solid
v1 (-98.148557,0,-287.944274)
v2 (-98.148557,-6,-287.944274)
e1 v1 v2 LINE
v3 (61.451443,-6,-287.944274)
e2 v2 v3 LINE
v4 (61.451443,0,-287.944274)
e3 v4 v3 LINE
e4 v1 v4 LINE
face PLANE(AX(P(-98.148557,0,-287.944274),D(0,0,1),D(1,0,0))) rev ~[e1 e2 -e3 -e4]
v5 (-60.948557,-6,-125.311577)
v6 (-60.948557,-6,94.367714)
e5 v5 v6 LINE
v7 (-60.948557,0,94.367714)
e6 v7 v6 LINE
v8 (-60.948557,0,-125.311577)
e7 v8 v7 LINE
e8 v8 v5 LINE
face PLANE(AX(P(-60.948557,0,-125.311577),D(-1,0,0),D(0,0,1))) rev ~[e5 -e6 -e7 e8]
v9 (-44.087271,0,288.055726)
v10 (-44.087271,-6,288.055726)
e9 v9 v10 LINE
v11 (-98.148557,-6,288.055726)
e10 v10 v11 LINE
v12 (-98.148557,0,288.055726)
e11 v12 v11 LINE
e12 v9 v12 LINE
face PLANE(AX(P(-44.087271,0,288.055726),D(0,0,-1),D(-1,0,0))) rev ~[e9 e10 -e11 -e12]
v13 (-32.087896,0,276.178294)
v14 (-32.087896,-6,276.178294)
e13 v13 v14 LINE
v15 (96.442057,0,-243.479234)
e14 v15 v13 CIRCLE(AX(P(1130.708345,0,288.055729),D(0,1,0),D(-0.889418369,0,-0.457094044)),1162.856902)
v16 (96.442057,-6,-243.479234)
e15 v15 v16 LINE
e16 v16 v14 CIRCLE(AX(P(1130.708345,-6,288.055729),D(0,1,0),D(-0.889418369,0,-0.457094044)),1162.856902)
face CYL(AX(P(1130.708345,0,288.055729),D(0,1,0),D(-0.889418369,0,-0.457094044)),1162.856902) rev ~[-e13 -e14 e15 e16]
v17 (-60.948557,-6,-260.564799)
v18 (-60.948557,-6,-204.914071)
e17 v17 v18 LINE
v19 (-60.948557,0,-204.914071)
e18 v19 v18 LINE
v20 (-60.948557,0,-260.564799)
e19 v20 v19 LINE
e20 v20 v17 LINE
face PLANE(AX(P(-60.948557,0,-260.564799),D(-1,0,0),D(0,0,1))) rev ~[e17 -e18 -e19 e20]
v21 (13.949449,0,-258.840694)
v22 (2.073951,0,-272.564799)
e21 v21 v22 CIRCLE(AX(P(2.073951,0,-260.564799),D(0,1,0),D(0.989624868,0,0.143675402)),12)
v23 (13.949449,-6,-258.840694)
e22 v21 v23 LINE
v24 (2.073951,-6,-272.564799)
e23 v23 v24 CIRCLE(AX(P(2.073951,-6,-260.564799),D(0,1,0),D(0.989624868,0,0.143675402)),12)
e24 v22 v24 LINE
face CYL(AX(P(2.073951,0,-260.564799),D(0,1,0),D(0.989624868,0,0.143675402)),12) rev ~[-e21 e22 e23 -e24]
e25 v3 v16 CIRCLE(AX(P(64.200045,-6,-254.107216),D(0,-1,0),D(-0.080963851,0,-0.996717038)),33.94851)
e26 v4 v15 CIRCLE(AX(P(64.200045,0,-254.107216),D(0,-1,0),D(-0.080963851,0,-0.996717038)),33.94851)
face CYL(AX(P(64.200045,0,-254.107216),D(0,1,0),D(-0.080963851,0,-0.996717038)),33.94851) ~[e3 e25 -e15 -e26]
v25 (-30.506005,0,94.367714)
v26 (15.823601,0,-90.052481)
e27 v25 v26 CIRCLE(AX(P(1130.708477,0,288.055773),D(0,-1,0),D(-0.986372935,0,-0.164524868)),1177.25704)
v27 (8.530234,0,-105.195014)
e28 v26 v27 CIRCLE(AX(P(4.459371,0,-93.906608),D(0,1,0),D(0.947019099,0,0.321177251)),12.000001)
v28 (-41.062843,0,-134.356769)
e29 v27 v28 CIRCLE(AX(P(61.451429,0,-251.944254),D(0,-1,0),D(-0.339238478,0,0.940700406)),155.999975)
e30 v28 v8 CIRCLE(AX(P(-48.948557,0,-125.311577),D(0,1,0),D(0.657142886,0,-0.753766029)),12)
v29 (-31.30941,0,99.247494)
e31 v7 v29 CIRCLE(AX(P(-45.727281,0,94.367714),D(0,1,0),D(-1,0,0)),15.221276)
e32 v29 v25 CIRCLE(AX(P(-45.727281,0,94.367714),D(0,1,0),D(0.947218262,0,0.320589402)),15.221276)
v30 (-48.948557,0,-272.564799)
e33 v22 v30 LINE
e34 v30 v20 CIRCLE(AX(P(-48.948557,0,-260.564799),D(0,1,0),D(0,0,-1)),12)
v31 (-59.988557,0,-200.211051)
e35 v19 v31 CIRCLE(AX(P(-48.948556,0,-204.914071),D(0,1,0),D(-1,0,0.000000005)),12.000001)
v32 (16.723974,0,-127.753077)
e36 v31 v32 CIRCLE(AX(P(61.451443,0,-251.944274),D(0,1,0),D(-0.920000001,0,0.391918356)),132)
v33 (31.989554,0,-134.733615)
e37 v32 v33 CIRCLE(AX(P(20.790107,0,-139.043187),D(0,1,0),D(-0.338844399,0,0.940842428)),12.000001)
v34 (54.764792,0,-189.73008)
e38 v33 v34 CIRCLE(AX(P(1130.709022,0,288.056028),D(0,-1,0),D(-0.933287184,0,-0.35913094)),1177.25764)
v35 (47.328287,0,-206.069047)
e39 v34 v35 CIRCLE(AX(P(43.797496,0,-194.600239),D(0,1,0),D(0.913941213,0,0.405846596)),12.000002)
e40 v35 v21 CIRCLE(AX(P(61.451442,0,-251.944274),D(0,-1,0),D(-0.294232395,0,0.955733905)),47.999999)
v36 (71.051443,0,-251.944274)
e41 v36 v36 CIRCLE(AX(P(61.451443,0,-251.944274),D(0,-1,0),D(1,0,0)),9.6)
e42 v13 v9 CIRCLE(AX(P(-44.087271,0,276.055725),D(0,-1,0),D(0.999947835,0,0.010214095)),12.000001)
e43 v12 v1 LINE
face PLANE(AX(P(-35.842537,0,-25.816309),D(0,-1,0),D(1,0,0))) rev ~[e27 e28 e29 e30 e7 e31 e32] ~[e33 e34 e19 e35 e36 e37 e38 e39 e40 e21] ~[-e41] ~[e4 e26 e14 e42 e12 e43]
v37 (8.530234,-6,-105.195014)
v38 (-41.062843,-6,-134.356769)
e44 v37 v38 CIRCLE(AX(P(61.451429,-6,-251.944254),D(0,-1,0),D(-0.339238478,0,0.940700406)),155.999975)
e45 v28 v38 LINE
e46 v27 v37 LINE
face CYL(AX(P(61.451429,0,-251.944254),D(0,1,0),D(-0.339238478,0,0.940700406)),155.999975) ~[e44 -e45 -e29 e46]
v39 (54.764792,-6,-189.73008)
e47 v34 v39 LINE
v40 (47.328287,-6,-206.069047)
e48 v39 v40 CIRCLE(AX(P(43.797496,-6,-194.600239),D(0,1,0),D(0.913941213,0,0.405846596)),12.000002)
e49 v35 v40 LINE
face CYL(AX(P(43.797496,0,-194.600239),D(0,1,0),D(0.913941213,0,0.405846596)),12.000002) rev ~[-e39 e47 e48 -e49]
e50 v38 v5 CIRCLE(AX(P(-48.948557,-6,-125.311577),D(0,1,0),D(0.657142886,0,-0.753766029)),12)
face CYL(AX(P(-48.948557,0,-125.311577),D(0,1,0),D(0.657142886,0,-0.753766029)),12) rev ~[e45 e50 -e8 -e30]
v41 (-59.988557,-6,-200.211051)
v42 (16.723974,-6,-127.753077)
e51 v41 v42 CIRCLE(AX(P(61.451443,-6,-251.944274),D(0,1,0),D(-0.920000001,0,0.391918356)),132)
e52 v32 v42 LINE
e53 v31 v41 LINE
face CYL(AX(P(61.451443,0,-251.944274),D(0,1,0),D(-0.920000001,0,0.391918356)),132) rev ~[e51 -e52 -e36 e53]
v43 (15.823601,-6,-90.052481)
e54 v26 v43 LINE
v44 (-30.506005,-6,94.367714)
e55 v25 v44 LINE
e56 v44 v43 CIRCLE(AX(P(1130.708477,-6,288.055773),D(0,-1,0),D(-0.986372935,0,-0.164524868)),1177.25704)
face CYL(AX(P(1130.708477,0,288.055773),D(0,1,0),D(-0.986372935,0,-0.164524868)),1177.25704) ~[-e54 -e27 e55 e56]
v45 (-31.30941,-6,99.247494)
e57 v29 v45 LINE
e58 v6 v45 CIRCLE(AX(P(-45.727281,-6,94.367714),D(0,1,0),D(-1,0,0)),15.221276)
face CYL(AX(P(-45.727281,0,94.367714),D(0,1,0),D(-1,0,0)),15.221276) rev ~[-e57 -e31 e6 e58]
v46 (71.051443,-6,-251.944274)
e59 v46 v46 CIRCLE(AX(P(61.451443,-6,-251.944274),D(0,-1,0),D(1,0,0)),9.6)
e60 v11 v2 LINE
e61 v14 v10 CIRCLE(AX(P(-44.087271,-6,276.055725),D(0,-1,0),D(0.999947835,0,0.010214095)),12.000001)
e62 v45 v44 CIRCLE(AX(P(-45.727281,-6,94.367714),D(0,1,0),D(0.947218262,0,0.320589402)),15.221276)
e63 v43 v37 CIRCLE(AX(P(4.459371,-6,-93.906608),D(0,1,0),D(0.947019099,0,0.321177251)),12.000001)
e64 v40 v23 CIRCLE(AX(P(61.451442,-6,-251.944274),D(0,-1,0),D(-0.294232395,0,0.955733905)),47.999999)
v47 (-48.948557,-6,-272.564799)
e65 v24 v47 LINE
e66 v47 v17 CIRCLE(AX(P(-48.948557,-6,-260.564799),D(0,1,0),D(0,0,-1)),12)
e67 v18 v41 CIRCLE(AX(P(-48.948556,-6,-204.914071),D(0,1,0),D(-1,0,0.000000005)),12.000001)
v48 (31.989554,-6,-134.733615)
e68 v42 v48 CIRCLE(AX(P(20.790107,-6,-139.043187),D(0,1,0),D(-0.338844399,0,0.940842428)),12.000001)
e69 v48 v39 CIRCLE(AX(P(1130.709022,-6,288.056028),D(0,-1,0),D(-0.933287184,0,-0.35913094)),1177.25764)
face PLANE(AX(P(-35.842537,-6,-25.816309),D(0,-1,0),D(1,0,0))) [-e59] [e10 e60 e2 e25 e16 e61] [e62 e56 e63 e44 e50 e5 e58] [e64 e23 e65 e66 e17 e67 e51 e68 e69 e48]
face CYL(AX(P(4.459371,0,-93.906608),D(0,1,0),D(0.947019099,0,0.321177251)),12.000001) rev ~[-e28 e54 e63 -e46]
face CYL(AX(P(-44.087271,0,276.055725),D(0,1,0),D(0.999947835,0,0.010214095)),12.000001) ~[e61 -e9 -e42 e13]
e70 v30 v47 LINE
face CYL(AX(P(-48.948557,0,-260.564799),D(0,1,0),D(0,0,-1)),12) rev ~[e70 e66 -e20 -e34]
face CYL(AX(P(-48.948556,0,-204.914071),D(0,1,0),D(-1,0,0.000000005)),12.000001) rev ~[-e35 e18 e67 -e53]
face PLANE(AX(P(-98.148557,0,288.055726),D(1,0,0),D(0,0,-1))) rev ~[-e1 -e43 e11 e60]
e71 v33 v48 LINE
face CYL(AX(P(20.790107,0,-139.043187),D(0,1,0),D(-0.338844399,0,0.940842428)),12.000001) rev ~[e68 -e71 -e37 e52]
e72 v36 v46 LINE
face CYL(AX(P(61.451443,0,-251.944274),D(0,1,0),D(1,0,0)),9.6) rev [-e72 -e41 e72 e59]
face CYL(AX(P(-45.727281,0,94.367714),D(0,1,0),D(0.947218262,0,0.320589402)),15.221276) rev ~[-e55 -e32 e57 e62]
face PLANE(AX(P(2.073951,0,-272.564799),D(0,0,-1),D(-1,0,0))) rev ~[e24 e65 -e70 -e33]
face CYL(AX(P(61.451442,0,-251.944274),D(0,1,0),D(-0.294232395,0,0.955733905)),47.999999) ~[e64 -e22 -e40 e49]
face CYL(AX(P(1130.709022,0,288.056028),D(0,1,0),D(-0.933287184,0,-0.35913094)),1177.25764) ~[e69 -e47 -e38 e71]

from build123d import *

# Parameters (mm, degrees)
F0_R     = 9.6
F1_DEPTH = 6


# Not quite as in the source:
# - ends of sketch curves that miss each other by under 0.0002 mm in the source are joined


with BuildPart() as f1:
    # F0 (on Front) → F1 (new body)
    with BuildSketch(Plane.XZ):
        with BuildLine():
            Line((-98.148557, 288.055726), (-98.148557, -287.944274))
            Line((-98.148557, -287.944274), (61.451443, -287.944274))
            ThreePointArc((61.451443, -287.944274), (90.8786929022, -275.1012880869), (96.4420569386, -243.4792343499))
            ThreePointArc((96.4420569386, -243.4792343499), (1.8673791595, 8.8528531517), (-32.087896312, 276.178294007))
            ThreePointArc((-32.087896312, 276.178294007), (-35.6454351808, 284.5842316136), (-44.087271, 288.055726))
            Line((-44.087271, 288.055726), (-98.148557, 288.055726))
        make_face()
        with BuildLine():
            ThreePointArc((-59.9885571325, -200.2110509435), (-29.1876571231, -155.9830655412), (16.7239738658, -127.7530766274))
            ThreePointArc((16.7239738658, -127.7530766274), (25.780399848, -128.1300293864), (31.9895542757, -134.7336148939))
            ThreePointArc((31.9895542757, -134.7336148939), (43.0295184538, -162.3758186302), (54.7647919037, -189.7300795987))
            ThreePointArc((54.7647919037, -189.7300795987), (54.7194507021, -199.5712496832), (47.3282871338, -206.0690474345))
            ThreePointArc((47.3282871338, -206.0690474345), (20.885121351, -226.2854831503), (13.9494494618, -258.8406940781))
            ThreePointArc((13.9494494618, -258.8406940781), (11.1483451659, -268.4168923847), (2.073951, -272.564799))
            Line((2.073951, -272.564799), (-48.948557, -272.564799))
            ThreePointArc((-48.948557, -272.564799), (-57.4338383742, -269.0500803742), (-60.948557, -260.564799))
            Line((-60.948557, -260.564799), (-60.948557, -204.914071))
            ThreePointArc((-60.948557, -204.914071), (-60.7061077935, -202.514071138), (-59.9885571325, -200.2110509435))
        make_face(mode=Mode.SUBTRACT)
        with BuildLine():
            ThreePointArc((-31.3094104055, 99.2474937685), (-30.7081992917, 96.8404508863), (-30.506005, 94.367714))
            ThreePointArc((-30.506005, 94.367714), (-11.0707369719, 1.2206915156), (15.8236014105, -90.0524808608))
            ThreePointArc((15.8236014105, -90.0524808608), (15.2706893662, -99.1138555668), (8.5302342503, -105.1950136941))
            ThreePointArc((8.5302342503, -105.1950136941), (-17.6222584193, -117.4699279564), (-41.0628425771, -134.3567693381))
            ThreePointArc((-41.0628425771, -134.3567693381), (-53.9170288848, -136.2346849428), (-60.948557, -125.311577))
            Line((-60.948557, -125.311577), (-60.948557, 94.367714))
            ThreePointArc((-60.948557, 94.367714), (-48.2000178863, 109.3867957083), (-31.3094104055, 99.2474937685))
        make_face(mode=Mode.SUBTRACT)
        with Locations((61.451443, -251.944274)):
            Circle(F0_R, mode=Mode.SUBTRACT)
    extrude(amount=F1_DEPTH)


solid = f1.part
